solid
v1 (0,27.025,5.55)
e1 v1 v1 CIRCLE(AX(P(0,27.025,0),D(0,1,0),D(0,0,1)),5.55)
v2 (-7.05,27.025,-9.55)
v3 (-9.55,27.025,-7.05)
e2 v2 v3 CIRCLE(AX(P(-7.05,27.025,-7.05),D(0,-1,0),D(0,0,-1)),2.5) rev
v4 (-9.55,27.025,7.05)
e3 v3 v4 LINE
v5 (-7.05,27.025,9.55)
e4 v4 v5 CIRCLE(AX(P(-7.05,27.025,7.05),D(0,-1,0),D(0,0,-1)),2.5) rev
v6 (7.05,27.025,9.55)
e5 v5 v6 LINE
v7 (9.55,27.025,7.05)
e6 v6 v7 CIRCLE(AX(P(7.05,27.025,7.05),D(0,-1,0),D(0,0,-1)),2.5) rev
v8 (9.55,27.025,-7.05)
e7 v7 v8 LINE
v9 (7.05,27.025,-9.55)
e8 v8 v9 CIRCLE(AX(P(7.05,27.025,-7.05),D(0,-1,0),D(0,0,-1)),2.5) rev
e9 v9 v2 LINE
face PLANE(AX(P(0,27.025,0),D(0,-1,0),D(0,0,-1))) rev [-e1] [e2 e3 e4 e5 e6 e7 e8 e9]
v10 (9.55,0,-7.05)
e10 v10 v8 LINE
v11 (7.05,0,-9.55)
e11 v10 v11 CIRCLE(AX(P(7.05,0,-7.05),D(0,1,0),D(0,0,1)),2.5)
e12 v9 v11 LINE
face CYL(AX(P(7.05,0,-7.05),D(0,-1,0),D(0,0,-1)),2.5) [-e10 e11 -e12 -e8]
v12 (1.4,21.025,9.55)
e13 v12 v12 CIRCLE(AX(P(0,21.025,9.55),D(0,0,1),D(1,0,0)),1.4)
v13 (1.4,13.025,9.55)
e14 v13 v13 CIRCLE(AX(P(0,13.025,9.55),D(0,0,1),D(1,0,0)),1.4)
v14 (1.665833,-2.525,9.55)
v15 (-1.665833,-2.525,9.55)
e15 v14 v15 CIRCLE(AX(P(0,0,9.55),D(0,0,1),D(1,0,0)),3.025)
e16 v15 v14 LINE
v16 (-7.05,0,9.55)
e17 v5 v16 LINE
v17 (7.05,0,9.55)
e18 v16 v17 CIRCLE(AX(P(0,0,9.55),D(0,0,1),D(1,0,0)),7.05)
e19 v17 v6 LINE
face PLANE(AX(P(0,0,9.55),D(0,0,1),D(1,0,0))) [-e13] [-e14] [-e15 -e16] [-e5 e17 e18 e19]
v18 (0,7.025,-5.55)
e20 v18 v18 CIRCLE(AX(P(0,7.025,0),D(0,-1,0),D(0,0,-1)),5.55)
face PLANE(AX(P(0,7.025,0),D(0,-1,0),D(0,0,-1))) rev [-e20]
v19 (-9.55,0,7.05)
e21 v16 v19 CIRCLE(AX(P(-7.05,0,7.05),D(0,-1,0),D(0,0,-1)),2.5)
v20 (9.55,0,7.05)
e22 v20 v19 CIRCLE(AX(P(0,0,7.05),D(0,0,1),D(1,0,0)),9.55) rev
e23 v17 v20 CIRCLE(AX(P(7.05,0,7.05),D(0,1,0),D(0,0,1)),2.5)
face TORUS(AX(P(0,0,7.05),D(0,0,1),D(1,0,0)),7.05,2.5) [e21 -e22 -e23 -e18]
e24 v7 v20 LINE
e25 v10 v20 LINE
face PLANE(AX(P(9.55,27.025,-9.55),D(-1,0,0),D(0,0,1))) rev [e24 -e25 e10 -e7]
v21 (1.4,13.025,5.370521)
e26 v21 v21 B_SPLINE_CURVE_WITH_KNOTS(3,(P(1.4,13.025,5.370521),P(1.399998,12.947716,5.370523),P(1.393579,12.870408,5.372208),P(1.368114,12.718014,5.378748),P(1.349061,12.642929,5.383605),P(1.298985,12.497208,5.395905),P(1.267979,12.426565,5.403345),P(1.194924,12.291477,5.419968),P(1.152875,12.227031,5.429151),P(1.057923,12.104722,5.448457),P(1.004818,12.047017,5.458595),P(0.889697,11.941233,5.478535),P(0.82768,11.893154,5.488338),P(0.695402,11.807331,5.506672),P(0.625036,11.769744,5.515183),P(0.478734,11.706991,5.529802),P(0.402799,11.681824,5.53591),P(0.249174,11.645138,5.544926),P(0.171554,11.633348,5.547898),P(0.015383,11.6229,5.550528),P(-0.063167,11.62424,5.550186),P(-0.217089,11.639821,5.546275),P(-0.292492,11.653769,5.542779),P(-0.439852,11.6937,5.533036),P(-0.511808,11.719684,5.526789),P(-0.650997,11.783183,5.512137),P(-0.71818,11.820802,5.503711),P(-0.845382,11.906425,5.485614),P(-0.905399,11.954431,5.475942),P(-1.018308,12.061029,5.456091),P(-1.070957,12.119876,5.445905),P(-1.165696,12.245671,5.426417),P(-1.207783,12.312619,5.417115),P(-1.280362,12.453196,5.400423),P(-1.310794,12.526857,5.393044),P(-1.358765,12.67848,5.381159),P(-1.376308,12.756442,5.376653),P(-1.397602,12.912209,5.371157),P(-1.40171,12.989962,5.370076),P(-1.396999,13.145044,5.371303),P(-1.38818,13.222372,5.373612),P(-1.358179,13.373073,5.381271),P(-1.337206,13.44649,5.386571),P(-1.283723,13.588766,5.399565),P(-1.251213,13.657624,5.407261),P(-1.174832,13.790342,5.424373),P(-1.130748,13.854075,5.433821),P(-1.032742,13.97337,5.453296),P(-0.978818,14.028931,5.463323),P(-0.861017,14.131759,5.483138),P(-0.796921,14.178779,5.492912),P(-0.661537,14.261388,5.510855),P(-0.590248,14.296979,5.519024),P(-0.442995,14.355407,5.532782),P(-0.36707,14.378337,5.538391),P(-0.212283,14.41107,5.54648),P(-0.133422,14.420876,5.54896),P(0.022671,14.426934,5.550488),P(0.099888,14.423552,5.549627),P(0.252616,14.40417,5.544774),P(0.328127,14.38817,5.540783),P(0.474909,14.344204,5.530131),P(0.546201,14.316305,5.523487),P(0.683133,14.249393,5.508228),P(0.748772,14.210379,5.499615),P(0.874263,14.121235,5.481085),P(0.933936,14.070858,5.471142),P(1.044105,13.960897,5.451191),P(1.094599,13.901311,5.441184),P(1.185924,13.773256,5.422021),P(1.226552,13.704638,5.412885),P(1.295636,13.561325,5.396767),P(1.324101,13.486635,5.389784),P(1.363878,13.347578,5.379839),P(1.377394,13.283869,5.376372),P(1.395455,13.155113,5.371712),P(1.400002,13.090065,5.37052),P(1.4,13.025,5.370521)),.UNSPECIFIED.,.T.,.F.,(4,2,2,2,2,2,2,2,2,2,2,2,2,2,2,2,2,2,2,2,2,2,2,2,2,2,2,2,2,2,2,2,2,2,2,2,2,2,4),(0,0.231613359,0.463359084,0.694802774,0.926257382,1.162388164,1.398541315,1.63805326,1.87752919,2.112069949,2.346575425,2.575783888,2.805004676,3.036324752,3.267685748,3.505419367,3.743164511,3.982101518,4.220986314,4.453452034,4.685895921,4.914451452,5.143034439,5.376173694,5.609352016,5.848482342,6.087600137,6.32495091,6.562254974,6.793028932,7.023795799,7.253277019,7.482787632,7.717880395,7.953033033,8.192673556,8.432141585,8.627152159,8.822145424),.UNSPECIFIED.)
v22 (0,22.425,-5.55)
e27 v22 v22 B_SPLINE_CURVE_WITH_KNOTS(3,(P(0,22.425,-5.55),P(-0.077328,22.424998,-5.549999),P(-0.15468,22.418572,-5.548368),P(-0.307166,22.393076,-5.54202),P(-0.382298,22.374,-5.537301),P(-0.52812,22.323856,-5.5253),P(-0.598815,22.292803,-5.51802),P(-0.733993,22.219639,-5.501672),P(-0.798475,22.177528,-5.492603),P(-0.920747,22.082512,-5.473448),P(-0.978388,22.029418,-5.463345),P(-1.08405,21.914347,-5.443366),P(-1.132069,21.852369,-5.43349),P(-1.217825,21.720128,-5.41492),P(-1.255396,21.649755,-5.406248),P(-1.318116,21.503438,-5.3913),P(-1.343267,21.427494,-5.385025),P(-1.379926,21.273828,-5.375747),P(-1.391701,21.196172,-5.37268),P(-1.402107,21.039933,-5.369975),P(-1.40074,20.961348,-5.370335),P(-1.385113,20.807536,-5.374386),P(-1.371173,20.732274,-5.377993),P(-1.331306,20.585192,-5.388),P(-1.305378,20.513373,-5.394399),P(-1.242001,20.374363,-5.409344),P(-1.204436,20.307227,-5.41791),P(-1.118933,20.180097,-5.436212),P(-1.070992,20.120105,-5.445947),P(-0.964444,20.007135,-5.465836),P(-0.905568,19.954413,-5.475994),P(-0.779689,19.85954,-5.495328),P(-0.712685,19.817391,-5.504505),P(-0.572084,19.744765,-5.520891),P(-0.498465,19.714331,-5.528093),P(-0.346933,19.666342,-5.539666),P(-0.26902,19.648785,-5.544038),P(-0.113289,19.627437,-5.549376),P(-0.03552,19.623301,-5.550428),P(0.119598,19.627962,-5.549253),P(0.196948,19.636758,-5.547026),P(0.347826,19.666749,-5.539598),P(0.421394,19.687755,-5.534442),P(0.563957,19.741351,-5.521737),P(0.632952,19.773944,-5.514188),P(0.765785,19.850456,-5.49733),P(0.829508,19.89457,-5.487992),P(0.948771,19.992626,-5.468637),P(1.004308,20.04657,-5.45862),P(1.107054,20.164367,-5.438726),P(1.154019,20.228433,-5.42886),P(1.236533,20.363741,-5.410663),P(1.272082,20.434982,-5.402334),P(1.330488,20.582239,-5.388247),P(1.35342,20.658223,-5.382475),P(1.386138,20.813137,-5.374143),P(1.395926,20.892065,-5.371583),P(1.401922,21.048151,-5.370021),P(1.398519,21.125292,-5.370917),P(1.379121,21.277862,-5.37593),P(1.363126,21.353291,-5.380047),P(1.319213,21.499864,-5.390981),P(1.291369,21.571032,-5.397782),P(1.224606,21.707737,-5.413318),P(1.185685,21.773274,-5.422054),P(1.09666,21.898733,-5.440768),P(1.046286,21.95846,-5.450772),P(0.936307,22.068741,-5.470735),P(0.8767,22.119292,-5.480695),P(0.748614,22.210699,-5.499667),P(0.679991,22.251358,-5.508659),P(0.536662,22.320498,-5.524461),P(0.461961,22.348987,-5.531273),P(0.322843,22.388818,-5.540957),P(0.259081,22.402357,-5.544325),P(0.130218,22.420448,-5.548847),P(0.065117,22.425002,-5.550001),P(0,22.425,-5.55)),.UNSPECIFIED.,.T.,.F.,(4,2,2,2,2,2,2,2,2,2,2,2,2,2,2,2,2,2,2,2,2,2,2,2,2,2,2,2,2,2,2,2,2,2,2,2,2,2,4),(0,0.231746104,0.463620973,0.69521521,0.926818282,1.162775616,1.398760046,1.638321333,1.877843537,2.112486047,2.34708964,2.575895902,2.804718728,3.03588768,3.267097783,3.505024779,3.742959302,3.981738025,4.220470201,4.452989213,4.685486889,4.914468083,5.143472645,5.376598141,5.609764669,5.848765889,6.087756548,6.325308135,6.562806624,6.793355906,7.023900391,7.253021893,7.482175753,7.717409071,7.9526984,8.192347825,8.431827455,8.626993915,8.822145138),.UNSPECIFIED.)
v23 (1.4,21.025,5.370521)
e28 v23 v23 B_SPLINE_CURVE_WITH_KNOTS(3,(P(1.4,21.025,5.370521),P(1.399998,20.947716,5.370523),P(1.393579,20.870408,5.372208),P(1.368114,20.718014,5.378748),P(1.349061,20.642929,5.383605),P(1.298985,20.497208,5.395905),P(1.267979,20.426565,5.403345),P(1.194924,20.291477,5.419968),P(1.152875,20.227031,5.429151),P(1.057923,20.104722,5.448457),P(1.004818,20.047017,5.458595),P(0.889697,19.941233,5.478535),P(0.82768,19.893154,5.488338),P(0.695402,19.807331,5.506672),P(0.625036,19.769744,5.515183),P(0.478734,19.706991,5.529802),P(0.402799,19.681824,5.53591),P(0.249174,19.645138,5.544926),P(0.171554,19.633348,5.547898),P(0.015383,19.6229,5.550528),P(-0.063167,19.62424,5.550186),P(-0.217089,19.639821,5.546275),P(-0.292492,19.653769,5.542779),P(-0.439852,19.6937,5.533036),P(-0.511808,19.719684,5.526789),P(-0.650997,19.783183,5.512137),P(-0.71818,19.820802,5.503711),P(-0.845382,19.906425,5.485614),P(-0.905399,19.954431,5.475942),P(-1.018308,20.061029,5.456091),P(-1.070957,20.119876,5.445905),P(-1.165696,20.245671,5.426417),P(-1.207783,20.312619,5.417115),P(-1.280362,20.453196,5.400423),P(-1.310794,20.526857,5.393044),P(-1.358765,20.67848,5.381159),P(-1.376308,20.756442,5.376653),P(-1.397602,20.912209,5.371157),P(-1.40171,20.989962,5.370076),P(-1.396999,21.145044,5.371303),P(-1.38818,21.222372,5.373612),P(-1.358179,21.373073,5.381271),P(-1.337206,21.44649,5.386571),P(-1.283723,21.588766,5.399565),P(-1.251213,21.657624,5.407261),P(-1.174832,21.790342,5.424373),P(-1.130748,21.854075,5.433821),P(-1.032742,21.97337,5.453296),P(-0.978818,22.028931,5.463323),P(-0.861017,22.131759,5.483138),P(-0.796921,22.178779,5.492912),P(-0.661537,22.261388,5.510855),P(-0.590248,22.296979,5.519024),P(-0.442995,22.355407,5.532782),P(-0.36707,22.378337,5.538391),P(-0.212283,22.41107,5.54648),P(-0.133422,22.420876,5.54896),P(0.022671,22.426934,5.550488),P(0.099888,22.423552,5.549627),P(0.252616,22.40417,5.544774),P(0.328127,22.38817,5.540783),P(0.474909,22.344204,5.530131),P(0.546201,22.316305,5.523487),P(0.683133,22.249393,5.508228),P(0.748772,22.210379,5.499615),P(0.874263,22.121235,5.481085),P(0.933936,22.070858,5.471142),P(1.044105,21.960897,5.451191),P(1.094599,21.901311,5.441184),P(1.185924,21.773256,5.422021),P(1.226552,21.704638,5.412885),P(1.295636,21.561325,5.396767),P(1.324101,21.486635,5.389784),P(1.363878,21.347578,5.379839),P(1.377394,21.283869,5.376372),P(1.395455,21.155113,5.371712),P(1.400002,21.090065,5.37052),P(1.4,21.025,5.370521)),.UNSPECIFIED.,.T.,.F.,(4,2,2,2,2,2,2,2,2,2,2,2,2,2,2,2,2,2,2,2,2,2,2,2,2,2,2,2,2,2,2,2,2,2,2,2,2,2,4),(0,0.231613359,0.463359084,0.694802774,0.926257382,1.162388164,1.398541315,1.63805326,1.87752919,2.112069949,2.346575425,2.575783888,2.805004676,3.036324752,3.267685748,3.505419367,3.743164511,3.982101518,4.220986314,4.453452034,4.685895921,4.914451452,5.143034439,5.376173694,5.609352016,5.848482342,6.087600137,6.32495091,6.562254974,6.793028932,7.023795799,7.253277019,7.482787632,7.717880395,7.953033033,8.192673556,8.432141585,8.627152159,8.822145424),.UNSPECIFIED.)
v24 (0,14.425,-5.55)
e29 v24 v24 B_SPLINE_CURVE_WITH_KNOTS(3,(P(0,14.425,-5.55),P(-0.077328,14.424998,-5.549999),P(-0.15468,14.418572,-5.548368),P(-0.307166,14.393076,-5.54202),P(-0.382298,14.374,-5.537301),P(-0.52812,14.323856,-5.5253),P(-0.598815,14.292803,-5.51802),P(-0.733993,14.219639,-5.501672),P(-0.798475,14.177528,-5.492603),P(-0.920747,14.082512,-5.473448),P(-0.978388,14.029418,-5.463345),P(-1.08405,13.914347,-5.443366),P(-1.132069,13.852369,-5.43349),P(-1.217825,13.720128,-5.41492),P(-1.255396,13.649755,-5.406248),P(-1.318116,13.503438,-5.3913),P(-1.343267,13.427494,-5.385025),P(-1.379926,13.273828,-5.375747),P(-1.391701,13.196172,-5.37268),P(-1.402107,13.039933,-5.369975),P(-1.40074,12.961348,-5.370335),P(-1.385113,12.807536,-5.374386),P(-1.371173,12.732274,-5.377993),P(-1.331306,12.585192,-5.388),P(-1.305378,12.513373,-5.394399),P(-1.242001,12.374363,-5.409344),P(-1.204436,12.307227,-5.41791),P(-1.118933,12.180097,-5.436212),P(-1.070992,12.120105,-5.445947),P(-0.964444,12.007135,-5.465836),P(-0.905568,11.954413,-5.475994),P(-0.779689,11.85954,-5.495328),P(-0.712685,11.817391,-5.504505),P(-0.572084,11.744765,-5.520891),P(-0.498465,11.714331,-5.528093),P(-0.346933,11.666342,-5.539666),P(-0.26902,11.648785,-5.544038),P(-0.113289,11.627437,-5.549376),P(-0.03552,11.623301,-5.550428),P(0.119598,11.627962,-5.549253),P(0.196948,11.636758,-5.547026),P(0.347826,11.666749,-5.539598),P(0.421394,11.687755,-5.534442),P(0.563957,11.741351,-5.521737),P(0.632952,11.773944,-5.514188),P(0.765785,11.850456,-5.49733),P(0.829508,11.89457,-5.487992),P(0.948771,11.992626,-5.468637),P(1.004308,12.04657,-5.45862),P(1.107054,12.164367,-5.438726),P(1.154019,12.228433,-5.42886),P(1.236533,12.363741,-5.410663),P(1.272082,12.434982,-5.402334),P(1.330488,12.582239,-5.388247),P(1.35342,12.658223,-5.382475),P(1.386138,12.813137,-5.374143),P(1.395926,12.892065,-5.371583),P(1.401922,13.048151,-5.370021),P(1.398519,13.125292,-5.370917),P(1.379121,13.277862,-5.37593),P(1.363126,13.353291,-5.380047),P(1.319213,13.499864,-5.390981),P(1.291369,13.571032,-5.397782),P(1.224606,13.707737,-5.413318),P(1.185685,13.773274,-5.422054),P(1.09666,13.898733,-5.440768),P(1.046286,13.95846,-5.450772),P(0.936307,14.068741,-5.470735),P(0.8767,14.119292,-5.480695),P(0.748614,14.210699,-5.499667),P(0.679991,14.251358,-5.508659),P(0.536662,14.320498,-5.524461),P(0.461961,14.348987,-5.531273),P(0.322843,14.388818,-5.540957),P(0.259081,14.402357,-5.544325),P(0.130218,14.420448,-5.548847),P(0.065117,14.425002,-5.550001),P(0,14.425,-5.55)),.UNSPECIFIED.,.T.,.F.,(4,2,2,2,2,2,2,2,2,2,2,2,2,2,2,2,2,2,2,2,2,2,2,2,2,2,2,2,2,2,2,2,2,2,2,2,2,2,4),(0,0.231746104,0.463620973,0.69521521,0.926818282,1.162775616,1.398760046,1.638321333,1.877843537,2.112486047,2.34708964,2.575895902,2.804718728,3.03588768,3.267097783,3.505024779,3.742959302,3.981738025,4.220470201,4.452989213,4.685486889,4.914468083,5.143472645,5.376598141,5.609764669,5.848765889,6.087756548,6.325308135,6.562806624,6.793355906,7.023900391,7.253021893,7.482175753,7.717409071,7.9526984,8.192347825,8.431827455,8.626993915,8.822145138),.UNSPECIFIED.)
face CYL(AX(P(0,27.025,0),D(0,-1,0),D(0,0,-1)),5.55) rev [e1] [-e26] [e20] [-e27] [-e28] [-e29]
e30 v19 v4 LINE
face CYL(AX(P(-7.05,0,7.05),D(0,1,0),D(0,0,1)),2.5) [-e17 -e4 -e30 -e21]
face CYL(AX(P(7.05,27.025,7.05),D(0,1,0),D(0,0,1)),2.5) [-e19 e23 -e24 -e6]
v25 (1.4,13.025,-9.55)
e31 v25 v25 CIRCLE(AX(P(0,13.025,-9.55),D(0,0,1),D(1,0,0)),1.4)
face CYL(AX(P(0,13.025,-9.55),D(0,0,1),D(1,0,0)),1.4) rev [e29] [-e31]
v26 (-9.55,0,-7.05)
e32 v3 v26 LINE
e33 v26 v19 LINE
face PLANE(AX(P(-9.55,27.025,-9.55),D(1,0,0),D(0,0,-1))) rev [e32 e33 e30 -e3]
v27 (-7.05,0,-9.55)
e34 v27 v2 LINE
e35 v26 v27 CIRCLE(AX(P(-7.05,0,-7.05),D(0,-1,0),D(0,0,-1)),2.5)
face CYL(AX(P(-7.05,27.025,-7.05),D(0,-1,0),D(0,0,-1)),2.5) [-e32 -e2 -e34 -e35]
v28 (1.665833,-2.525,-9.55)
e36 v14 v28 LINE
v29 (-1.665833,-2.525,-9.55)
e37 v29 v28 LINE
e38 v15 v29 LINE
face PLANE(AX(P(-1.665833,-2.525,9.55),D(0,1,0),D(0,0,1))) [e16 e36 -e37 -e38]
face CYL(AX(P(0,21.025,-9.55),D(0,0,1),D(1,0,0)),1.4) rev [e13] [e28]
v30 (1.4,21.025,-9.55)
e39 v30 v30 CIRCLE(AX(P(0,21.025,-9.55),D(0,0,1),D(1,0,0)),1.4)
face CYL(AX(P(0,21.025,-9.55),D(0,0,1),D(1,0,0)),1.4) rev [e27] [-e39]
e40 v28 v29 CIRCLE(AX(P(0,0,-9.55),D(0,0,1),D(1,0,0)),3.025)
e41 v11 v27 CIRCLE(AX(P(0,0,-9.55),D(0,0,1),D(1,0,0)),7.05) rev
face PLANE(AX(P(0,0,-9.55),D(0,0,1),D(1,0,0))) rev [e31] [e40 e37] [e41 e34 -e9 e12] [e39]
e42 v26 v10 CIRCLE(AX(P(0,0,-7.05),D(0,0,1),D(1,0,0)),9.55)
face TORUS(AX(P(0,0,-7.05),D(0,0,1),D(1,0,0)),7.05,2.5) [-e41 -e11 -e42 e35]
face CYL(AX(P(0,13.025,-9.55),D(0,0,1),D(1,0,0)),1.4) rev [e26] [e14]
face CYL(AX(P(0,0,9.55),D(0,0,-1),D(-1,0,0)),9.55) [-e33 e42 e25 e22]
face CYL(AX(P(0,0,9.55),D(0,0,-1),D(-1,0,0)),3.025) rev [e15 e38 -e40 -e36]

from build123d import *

# Parameters (mm, degrees)
SKETCH4_R                 = 9.55
BOSS_EXTRUDE1_DEPTH       = 9.55
BOSS_EXTRUDE2_START       = -9.55
BOSS_EXTRUDE2_DEPTH       = 19.1
BOSS_EXTRUDE2_START_2     = 7.771744082
BOSS_EXTRUDE2_2_OUTLINE_R = 5.55
BOSS_EXTRUDE2_2_DEPTH     = 19.253255918
BOSS_EXTRUDE2_START_3     = -7
BOSS_EXTRUDE2_3_DEPTH     = 14
CUT_EXTRUDE1_START        = 7.025
SKETCH7_R                 = 5.55
CUT_EXTRUDE1_DEPTH        = 20
CUT_EXTRUDE2_DEPTH        = 31.211845862
CUT_EXTRUDE2_DEPTH_BACK   = 31.211845862
SKETCH6_R                 = 1.4
FILLET1_R                 = 2.5


with BuildPart() as part:
    # Sketch4 → Boss-Extrude1 (new, symmetric)
    with BuildSketch(Plane.XY):
        Circle(SKETCH4_R)
        with BuildLine():
            Line((-1.665833125, -2.525), (1.665833125, -2.525))
            ThreePointArc((1.665833125, -2.525), (0, 3.025), (-1.665833125, -2.525))
        make_face(mode=Mode.SUBTRACT)
    extrude(amount=BOSS_EXTRUDE1_DEPTH, both=True)

    # Boss-Extrude2: read off the stored shape, not the designer's step
    # Boss-Extrude2 outline → Boss-Extrude2 (add)
    with BuildSketch(Plane.XY.offset(BOSS_EXTRUDE2_START)):
        with BuildLine():
            Line((9.55, 27.025), (-9.55, 27.025))
            Line((-9.55, 27.025), (-9.55, 0))
            ThreePointArc((-9.55, 0), (0, 9.55), (9.55, 0))
            Line((9.55, 0), (9.55, 27.025))
        make_face()
    extrude(amount=BOSS_EXTRUDE2_DEPTH)

    # Boss-Extrude2 2 outline → Boss-Extrude2 2 (cut)
    with BuildSketch(Plane(origin=(0, 0, 0), x_dir=(1, 0, 0), z_dir=(0, 1, 0)).offset(BOSS_EXTRUDE2_START_2)):
        Circle(BOSS_EXTRUDE2_2_OUTLINE_R)
    extrude(amount=BOSS_EXTRUDE2_2_DEPTH, mode=Mode.SUBTRACT)

    # Boss-Extrude2 3 outline → Boss-Extrude2 3 (add)
    with BuildSketch(Plane.XY.offset(BOSS_EXTRUDE2_START_3)):
        with BuildLine():
            ThreePointArc((5.549999815, 7.771743823), (0, 9.55), (-5.549999815, 7.771743823))
            Line((-5.549999815, 7.771743823), (5.549999815, 7.771743823))
        make_face()
    extrude(amount=BOSS_EXTRUDE2_3_DEPTH)

    # Sketch7 → Cut-Extrude1 (cut)
    with BuildSketch(Plane(origin=(0, 0, 0), x_dir=(1, 0, 0), z_dir=(0, 1, 0)).offset(CUT_EXTRUDE1_START)):
        with Locations(Location((0, 0, 0), (0, 0, 90))):
            Circle(SKETCH7_R)
    extrude(amount=CUT_EXTRUDE1_DEPTH, mode=Mode.SUBTRACT)

    # Sketch6 → Cut-Extrude2 (cut, two sides: drawn at the far end of the back side and taken through both)
    with BuildSketch(Plane.XY.offset(-CUT_EXTRUDE2_DEPTH_BACK)):
        with Locations((0, 21.025)):
            Circle(SKETCH6_R)
        with Locations((0, 13.025)):
            Circle(SKETCH6_R)
    extrude(amount=CUT_EXTRUDE2_DEPTH + CUT_EXTRUDE2_DEPTH_BACK, mode=Mode.SUBTRACT)

    # Fillet1
    fillet1_edges = [part.edges().sort_by_distance(p)[0] for p in [
        (0, -9.55, 9.55),
        (0, -9.55, -9.55),
        (-9.55, 13.5125, -9.55),
        (-9.55, 13.5125, 9.55),
        (9.55, 13.5125, 9.55),
        (9.55, 13.5125, -9.55),
    ]]
    fillet(fillet1_edges, radius=FILLET1_R)


solid = part.part
